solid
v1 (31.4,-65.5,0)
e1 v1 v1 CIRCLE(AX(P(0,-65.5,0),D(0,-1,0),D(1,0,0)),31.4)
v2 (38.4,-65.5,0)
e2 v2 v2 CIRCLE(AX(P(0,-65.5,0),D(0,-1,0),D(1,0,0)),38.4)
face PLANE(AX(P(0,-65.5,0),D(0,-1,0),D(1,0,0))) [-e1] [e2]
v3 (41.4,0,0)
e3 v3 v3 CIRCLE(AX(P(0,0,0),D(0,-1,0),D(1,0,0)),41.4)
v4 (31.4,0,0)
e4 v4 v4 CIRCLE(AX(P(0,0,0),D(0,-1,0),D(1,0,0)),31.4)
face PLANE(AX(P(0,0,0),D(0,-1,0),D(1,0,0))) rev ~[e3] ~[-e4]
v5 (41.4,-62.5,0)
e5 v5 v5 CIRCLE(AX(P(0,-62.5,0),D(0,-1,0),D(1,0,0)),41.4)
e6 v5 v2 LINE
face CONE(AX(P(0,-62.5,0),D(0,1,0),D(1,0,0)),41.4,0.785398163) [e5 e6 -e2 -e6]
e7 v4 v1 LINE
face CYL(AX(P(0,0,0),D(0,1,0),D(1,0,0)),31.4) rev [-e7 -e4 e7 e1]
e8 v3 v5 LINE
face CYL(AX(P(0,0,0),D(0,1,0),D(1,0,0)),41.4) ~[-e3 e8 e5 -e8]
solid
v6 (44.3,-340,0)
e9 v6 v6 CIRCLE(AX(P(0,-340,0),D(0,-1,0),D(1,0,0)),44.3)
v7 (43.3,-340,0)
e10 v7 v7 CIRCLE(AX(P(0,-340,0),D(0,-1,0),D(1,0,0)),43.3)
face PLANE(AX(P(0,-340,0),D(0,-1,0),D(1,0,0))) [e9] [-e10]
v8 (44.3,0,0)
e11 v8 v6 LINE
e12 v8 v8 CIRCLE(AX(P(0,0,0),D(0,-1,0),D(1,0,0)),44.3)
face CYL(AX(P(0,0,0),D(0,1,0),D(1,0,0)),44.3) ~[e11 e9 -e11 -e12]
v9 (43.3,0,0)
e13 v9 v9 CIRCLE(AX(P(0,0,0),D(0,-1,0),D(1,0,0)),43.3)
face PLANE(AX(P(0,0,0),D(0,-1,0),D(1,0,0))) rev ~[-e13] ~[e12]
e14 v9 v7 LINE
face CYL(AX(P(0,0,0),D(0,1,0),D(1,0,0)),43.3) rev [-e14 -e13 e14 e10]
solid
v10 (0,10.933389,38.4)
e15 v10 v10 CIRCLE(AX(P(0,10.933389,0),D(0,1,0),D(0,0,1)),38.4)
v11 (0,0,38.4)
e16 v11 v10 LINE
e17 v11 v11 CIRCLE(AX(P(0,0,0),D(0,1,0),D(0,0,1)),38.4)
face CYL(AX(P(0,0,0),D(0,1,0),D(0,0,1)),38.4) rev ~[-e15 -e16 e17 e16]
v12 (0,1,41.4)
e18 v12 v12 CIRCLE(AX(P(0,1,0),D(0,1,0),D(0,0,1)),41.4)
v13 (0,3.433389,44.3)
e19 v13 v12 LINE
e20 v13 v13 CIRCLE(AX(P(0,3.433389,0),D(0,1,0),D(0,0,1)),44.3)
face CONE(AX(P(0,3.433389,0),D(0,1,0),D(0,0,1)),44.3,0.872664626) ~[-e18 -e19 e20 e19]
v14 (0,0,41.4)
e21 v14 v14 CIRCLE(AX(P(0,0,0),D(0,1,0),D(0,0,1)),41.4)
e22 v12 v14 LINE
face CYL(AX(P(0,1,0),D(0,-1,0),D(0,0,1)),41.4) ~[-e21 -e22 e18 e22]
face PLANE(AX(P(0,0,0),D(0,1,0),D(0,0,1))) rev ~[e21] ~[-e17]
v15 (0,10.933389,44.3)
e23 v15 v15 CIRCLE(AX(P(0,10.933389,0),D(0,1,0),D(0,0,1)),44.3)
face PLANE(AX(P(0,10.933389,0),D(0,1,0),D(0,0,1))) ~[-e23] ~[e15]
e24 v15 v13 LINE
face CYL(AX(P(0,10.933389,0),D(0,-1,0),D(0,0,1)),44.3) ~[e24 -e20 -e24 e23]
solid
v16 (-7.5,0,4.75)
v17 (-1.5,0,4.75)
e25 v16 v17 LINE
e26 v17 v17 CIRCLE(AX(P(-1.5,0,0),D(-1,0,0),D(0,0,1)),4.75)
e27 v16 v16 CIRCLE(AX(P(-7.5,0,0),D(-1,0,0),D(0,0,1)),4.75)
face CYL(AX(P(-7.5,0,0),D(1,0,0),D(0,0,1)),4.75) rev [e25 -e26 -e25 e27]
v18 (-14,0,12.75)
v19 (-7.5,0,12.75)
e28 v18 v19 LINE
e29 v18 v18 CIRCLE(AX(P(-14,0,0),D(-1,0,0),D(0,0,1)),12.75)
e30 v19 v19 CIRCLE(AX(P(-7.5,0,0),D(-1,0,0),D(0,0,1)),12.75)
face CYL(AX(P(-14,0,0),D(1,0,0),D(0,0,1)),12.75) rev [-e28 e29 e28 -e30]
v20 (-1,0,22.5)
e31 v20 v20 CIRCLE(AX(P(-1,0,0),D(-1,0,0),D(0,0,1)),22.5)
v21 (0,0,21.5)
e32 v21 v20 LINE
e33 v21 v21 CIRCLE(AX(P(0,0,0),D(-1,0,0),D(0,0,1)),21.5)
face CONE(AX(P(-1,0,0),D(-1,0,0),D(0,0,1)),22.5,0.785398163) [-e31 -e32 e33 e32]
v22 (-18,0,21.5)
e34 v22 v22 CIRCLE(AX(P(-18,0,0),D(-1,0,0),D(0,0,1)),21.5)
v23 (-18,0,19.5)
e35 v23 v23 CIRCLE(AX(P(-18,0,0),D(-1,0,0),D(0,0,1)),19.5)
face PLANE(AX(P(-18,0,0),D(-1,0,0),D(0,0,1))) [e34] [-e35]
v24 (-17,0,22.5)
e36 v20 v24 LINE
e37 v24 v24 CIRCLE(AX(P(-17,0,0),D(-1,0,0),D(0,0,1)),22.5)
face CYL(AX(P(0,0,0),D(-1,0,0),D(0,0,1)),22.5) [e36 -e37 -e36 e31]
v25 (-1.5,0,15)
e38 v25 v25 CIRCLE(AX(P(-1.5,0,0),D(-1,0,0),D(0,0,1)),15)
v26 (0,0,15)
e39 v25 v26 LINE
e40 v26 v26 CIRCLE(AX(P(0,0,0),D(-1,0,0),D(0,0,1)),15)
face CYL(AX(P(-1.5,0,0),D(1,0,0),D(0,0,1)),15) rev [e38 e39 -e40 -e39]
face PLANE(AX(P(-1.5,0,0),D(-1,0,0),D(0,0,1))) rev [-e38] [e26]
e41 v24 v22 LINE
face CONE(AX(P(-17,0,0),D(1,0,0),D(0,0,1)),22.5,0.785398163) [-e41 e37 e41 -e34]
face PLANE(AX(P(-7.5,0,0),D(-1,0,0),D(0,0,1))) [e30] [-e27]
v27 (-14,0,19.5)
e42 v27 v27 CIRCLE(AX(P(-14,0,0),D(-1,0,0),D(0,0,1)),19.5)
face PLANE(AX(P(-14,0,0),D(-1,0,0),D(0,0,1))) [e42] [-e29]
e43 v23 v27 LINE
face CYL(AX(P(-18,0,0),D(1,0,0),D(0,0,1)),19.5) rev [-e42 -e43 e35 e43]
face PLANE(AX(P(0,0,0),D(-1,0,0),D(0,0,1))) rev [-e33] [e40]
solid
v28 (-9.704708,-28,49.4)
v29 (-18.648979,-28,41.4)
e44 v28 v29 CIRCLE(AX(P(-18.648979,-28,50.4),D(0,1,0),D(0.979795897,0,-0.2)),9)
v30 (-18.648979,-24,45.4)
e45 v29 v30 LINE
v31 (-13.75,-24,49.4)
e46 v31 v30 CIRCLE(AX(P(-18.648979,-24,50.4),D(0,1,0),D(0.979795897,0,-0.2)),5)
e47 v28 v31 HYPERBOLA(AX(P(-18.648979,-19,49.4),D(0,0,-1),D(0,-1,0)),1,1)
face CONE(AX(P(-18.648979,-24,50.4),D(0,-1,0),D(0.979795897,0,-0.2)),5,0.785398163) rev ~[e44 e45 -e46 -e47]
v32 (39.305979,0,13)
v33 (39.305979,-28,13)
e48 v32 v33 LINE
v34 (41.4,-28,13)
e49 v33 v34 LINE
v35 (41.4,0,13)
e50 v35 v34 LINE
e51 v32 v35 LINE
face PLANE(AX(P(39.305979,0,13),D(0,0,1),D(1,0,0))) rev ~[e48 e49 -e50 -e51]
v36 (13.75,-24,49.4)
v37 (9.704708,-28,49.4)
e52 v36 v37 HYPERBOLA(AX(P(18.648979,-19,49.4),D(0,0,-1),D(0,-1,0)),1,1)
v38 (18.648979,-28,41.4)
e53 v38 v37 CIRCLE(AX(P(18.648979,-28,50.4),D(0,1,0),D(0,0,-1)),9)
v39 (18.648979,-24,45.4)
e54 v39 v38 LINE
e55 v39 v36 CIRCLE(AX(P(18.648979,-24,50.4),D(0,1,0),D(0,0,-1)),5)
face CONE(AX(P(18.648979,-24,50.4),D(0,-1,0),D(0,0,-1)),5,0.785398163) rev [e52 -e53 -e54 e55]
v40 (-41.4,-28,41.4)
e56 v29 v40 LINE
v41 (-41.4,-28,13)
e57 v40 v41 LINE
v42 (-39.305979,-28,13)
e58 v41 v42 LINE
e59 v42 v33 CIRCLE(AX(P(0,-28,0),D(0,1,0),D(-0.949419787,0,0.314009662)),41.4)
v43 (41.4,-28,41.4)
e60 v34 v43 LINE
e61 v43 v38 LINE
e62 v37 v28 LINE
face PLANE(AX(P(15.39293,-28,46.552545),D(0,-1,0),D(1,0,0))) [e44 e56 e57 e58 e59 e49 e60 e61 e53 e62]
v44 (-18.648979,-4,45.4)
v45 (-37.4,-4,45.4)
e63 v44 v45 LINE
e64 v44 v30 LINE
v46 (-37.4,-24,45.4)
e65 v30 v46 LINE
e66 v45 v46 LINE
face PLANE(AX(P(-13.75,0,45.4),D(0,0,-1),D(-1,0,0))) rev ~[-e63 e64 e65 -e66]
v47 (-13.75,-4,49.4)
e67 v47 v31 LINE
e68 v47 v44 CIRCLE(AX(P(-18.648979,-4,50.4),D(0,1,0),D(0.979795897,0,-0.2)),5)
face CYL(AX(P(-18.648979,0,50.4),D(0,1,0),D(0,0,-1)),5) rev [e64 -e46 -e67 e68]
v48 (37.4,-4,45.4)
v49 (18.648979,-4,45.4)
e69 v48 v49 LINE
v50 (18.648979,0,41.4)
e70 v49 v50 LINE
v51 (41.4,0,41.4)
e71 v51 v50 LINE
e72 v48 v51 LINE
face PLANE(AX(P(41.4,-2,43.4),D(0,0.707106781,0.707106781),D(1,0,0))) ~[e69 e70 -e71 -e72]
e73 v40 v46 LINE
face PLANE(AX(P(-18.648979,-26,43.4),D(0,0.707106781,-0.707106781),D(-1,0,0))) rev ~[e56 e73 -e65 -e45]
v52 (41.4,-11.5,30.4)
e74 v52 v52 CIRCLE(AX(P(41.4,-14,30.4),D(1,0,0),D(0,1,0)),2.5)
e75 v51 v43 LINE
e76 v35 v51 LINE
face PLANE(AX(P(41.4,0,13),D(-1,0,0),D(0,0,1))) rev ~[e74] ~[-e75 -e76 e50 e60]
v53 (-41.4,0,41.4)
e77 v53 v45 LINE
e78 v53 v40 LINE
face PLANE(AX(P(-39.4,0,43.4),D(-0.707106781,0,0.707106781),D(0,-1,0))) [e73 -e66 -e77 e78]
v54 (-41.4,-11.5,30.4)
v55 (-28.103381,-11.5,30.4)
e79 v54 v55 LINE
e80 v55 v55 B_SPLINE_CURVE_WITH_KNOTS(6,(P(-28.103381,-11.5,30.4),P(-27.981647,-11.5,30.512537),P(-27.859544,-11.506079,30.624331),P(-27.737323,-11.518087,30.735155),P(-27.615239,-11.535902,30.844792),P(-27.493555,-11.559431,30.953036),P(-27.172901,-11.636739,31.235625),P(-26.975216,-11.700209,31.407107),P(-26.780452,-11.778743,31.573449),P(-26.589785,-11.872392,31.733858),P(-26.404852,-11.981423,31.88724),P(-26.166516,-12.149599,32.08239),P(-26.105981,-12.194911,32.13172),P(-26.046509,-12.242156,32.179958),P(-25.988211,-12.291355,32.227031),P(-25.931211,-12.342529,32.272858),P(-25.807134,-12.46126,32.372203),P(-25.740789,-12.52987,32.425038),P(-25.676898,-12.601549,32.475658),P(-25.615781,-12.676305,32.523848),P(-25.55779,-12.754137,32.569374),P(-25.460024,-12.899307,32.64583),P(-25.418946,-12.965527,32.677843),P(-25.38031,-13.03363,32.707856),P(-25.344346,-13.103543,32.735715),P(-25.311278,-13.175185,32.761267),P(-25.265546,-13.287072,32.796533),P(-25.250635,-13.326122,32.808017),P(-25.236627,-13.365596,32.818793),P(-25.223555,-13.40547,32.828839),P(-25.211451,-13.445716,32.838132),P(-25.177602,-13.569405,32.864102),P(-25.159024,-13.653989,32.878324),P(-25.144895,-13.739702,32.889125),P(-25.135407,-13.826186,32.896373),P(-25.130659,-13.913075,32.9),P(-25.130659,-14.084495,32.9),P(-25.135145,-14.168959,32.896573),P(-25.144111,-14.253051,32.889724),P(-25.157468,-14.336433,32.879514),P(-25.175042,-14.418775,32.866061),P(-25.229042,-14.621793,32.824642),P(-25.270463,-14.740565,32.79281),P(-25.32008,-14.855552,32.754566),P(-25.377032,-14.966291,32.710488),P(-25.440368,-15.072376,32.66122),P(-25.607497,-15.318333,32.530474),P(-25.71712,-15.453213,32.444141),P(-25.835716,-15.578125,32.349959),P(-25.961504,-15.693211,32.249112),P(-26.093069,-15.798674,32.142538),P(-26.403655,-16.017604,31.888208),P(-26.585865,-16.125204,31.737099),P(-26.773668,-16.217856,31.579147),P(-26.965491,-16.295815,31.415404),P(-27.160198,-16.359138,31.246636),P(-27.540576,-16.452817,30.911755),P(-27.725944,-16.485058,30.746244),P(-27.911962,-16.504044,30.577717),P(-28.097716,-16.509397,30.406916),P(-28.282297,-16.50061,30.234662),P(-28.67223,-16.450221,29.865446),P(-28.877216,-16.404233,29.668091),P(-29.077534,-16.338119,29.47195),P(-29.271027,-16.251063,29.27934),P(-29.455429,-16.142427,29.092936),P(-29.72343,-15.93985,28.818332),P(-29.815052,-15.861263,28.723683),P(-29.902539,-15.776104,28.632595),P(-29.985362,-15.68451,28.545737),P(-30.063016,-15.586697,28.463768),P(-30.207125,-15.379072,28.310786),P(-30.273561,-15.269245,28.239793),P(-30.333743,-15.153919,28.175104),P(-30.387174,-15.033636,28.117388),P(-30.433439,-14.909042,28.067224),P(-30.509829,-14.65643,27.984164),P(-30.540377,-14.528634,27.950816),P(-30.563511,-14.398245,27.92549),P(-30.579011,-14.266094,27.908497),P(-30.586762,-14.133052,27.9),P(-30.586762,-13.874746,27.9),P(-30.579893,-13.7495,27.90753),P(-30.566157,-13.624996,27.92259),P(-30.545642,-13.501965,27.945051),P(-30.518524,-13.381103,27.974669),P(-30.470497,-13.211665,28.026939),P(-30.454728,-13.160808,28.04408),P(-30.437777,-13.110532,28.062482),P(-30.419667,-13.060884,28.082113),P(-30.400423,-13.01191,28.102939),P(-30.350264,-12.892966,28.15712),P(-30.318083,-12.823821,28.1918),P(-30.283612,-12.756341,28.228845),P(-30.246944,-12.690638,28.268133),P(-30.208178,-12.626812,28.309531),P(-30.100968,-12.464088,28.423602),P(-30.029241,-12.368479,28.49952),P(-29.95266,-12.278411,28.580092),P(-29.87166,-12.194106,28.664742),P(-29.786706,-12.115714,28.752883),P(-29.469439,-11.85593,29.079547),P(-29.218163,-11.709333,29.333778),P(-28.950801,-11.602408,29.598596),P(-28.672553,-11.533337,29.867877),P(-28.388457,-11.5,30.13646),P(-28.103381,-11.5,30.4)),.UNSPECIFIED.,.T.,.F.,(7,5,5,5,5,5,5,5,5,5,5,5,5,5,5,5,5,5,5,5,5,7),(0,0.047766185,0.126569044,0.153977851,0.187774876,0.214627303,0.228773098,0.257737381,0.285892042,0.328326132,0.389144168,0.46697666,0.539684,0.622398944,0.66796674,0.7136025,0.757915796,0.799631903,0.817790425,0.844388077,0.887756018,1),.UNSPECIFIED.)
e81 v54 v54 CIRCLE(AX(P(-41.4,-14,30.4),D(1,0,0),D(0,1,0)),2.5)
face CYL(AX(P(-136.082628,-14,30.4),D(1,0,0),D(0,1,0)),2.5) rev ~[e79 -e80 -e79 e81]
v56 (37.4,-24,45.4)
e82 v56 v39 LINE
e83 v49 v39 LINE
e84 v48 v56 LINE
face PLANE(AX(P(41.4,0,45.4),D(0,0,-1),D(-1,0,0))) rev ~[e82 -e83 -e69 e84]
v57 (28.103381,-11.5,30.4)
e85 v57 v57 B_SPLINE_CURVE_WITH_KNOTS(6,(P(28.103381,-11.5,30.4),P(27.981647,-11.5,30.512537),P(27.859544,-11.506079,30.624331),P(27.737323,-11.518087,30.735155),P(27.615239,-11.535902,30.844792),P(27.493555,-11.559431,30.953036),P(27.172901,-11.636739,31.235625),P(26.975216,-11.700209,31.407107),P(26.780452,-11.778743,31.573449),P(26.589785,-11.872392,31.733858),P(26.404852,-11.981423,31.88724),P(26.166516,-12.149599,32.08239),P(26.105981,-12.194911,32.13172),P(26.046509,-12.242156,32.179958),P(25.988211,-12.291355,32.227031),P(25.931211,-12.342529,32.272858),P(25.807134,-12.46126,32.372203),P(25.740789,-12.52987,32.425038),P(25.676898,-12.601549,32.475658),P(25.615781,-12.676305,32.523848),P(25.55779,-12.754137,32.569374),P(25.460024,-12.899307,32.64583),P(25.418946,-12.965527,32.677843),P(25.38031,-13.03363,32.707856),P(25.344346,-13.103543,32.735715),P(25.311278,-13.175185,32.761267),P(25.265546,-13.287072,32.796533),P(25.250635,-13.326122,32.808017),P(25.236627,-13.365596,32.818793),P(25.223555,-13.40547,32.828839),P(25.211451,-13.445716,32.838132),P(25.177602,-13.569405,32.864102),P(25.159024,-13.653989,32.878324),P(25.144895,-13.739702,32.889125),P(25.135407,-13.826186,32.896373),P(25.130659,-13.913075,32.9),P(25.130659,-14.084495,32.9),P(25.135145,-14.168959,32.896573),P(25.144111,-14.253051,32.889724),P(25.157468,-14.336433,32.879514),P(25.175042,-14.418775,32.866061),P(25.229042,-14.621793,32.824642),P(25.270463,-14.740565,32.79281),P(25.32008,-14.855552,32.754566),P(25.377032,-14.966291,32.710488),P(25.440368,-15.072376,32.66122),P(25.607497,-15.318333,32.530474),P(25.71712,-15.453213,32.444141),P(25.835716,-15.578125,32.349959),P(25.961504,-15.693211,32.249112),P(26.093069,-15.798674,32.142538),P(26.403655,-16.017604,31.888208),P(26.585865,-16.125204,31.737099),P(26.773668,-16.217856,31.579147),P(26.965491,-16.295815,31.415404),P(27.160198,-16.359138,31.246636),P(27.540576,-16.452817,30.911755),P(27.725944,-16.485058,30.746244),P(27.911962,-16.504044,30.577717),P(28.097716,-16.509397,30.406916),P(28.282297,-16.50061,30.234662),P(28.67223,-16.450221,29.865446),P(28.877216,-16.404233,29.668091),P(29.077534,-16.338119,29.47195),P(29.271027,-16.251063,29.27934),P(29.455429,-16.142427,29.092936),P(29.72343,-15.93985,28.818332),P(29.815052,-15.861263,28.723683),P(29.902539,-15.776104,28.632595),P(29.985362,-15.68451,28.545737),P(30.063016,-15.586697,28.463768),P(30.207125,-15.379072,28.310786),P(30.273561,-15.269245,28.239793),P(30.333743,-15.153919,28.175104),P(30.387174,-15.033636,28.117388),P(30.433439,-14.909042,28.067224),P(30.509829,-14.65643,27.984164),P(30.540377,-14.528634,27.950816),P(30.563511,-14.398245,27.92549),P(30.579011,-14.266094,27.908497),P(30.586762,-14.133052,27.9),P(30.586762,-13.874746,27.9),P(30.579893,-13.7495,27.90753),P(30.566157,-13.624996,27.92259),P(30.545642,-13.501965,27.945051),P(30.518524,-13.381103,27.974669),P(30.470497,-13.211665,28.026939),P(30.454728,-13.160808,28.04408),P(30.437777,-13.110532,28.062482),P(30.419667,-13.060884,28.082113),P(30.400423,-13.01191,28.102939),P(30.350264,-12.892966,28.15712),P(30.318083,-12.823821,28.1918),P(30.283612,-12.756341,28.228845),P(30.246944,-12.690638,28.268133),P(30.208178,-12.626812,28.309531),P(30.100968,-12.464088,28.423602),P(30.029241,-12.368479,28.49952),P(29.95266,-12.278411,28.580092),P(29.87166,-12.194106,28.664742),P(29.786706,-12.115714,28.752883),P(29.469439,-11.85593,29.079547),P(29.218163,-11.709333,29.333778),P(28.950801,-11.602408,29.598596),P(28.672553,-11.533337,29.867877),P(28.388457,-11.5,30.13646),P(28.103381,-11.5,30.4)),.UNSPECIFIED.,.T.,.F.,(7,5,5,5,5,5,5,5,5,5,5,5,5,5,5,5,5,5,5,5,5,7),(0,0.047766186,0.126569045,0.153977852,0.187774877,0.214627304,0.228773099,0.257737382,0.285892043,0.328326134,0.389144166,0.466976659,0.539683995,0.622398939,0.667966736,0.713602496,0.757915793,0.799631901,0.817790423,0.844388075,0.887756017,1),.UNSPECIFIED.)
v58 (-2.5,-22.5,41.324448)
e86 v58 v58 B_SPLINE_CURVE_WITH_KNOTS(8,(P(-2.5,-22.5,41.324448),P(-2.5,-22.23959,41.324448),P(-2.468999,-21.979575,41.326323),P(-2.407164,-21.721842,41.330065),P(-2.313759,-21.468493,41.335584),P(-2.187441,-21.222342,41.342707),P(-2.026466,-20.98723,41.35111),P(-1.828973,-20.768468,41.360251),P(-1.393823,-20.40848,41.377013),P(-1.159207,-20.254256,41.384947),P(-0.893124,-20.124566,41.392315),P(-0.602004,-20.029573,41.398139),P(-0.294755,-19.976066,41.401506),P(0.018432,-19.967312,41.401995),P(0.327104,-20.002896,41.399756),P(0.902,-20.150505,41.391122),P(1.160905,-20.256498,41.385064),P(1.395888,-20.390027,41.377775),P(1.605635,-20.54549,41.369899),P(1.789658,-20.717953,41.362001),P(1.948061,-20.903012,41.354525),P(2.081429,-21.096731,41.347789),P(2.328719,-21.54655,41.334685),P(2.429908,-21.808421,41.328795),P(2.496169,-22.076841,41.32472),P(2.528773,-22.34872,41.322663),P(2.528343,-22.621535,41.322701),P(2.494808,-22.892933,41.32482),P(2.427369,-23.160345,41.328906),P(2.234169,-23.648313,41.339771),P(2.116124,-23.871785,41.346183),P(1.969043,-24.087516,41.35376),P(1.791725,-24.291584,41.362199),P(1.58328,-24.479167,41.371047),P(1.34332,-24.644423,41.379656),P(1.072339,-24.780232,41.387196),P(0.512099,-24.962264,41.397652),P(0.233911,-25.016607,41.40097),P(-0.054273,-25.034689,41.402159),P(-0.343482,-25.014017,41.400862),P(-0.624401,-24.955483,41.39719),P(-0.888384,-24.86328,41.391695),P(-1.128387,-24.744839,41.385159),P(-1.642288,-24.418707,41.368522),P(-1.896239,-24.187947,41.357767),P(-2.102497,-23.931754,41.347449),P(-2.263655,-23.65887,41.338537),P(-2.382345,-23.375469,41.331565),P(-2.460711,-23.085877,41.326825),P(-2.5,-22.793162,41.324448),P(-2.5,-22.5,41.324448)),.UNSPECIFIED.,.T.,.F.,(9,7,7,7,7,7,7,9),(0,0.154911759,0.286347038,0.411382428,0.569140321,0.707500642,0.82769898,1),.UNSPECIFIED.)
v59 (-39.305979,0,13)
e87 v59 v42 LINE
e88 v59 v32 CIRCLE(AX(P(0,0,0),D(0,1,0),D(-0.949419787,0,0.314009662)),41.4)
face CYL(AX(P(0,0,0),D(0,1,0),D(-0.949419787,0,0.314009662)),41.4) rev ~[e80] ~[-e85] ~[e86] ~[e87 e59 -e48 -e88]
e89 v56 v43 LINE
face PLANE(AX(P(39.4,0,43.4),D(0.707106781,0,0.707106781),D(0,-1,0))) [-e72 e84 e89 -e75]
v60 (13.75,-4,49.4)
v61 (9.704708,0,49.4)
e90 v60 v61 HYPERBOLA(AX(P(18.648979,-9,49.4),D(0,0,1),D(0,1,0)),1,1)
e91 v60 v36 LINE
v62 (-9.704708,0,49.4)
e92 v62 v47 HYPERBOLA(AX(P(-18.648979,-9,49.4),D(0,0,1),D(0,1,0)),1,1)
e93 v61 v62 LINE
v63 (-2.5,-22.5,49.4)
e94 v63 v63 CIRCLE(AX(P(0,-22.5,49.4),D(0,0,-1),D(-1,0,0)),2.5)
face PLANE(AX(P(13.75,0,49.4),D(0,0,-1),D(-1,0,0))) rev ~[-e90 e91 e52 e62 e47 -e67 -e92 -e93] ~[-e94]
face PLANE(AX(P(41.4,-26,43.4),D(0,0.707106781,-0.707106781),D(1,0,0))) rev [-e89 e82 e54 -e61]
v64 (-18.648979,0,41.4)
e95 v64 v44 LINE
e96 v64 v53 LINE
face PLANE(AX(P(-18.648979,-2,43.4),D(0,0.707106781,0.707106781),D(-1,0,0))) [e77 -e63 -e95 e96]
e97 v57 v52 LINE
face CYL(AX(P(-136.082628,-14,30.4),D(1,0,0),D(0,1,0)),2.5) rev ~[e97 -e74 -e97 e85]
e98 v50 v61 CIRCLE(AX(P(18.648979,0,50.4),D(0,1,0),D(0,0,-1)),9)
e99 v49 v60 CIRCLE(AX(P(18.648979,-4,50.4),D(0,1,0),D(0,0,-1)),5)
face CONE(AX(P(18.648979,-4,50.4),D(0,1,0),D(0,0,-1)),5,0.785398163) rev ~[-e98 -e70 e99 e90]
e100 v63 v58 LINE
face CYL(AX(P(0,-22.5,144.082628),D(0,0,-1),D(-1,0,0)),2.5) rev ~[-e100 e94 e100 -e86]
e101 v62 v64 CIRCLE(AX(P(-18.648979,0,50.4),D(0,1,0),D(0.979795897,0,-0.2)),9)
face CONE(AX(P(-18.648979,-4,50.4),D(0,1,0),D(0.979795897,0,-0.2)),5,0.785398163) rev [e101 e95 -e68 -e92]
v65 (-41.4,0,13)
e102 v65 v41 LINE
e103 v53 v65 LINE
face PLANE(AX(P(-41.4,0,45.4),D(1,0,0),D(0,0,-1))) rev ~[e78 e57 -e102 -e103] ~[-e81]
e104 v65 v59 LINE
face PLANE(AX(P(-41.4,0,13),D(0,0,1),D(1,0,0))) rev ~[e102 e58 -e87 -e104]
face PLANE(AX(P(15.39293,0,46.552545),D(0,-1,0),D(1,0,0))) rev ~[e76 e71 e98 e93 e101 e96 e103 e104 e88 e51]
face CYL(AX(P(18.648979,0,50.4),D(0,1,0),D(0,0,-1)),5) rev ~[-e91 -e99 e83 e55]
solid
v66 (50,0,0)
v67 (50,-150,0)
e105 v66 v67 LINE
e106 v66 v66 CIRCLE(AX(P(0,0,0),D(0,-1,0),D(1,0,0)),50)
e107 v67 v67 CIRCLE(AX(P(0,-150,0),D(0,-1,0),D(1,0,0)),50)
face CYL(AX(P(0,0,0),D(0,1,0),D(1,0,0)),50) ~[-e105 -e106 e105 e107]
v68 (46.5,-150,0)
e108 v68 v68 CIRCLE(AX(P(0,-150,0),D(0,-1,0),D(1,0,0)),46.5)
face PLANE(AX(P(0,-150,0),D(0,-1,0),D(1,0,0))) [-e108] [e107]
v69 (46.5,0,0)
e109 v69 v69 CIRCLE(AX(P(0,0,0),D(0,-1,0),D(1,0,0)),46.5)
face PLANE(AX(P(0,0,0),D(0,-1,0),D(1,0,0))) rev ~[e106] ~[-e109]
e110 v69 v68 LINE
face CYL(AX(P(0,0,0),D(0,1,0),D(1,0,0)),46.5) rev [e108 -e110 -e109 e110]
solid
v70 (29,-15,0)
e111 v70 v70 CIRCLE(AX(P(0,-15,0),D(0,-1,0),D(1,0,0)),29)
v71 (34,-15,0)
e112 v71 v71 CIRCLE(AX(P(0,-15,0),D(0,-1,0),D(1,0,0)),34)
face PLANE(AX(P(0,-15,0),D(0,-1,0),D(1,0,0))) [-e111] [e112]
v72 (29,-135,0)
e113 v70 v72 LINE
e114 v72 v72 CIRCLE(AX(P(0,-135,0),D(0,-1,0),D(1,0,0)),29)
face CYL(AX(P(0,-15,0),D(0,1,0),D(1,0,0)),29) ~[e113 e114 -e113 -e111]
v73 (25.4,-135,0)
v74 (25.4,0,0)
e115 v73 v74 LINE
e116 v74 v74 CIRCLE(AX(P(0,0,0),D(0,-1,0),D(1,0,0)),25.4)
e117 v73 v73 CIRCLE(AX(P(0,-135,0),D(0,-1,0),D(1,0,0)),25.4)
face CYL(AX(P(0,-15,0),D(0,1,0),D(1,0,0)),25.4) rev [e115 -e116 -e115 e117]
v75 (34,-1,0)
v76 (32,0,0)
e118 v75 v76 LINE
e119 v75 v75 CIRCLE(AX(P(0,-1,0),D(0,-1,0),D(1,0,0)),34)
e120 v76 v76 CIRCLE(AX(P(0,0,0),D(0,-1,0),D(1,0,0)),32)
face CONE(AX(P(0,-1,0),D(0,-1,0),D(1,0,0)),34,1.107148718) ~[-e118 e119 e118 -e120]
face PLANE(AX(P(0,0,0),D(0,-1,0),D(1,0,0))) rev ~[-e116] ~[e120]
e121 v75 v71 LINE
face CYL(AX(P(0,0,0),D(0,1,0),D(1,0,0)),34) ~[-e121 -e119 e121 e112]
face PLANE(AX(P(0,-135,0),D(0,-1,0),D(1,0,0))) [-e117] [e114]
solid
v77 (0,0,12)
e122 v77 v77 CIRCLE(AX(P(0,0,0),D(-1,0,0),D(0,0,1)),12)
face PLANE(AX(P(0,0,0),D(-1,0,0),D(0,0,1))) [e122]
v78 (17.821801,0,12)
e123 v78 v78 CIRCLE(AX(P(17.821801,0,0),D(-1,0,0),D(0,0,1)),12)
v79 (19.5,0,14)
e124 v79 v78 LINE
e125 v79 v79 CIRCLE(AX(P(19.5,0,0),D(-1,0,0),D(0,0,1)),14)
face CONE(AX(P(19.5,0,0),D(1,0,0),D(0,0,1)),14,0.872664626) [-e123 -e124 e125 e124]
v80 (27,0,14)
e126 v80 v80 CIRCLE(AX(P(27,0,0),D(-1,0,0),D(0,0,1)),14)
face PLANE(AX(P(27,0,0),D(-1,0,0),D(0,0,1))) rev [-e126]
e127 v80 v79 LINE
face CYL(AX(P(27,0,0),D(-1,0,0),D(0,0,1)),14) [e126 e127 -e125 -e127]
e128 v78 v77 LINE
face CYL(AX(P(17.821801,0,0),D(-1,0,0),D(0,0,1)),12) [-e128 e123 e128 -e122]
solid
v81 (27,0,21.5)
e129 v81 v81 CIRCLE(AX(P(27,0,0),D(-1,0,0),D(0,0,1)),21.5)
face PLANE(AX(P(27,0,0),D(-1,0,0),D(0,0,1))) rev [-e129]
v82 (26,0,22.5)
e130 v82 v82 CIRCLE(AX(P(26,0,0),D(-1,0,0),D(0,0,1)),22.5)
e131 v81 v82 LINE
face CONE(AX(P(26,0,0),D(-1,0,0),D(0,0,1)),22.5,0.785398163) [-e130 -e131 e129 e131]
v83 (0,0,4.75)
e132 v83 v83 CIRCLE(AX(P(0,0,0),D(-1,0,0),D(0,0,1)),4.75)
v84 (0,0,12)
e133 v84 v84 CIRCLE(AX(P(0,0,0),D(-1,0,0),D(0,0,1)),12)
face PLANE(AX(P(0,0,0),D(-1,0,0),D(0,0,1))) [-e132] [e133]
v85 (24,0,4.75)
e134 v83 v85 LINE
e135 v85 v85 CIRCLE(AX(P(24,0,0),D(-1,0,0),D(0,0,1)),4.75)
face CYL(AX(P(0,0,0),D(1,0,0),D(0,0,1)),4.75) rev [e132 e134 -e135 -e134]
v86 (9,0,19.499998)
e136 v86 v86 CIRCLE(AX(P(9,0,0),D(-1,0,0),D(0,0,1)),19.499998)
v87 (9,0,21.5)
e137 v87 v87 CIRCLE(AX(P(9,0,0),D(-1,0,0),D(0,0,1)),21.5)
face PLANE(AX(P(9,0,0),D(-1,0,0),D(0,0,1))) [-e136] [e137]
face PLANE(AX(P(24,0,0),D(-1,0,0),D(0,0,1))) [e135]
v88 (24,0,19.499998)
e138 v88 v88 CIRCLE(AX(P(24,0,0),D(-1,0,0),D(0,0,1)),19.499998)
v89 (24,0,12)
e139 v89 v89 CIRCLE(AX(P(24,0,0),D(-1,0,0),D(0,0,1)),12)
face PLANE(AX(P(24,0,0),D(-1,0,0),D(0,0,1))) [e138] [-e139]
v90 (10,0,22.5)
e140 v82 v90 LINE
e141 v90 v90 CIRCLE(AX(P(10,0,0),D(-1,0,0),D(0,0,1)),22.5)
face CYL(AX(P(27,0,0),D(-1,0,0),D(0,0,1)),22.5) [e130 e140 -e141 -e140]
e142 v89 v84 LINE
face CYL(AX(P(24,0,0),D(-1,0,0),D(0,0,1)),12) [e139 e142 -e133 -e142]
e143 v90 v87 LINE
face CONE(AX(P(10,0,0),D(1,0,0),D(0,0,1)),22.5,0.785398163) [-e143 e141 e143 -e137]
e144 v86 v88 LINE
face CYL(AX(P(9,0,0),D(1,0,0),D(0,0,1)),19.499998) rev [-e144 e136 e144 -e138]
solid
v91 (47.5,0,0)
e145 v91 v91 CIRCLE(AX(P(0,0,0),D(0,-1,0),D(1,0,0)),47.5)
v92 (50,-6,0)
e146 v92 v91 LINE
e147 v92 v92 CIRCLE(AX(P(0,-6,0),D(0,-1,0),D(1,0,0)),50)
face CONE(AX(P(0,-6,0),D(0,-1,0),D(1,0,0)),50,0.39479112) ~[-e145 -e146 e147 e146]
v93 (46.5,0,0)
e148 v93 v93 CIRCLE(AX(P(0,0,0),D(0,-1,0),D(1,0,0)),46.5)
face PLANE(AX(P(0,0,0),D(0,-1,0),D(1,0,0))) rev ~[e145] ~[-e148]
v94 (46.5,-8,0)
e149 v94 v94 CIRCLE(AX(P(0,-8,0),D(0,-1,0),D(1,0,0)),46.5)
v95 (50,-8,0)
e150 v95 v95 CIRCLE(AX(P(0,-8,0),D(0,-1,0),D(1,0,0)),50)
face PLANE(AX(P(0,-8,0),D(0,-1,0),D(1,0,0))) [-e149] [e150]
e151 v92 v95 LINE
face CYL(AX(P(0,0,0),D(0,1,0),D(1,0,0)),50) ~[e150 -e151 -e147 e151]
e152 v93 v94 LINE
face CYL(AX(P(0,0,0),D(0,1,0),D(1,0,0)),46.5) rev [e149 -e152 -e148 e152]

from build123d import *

# Parameters (mm, degrees)
F0_R         = 41.4
F0_R_2       = 31.4
F1_DEPTH     = 65.5
F2_SIZE      = 3
F3_R         = 34
F3_R_2       = 25.4
F4_DEPTH     = 15
F5_R         = 29
F5_R_2       = 25.4
F6_DEPTH     = 120
F7_SIZE2     = 2
F7_SIZE      = 1
F11_DEPTH    = 28
F13_D        = 5
F14_T1_DEPTH = 28
F15_SIZE     = 4
F19_D        = 5
F22_SIZE     = 1
F25_SIZE     = 1
F26_R        = 44.3
F26_R_2      = 43.3
F27_DEPTH    = 340
F28_R        = 50
F28_R_2      = 46.5
F29_DEPTH    = 150
F30_R        = 50
F30_R_2      = 46.5
F31_DEPTH    = 8
F32_SIZE2    = 2.5
F32_SIZE     = 6


# Not quite as in the source:
# - a fillet or chamfer that OpenCascade refuses, or shapes differently, is made with other operations: its cross-section is extruded or revolved along the edge and cut away or added


with BuildPart() as f1:
    # F0 (on Front) → F1 (new body)
    with BuildSketch(Plane.XZ):
        Circle(F0_R)
        Circle(F0_R_2, mode=Mode.SUBTRACT)
    extrude(amount=F1_DEPTH)

    # F2
    f2_edges = [f1.edges().sort_by_distance(p)[0] for p in [
        (-41.4, -65.5, 0),
    ]]
    chamfer(f2_edges, length=F2_SIZE)


with BuildPart() as f4:
    # F3 (on Front) → F4 (new body)
    with BuildSketch(Plane.XZ):
        Circle(F3_R)
        Circle(F3_R_2, mode=Mode.SUBTRACT)
    extrude(amount=F4_DEPTH)

    # F5 (on face) → F6 (join)
    with BuildSketch(Plane.XZ.offset(15)):
        Circle(F5_R)
        Circle(F5_R_2, mode=Mode.SUBTRACT)
    extrude(amount=F6_DEPTH)

    # F7
    f7_edges = [f4.edges().sort_by_distance(p)[0] for p in [
        (-34, 0, 0),
    ]]
    f7_side = f4.faces().sort_by_distance((-34, -7.5, 0))[0]
    chamfer(f7_edges, length=F7_SIZE, length2=F7_SIZE2, reference=f7_side)


with BuildPart() as f9:
    # F8 (on Right) → F9 (revolve)
    with BuildSketch(Plane.YZ):
        Polygon((0, 41.4), (0, 38.4), (10.9333889304, 38.4), (10.9333889304, 44.3), (3.4333889304, 44.3), (1, 41.4), align=None)
    revolve(axis=Axis((0, 5.4666944652, 0), (0, 1, 0)))


with BuildPart() as f11:
    # F10 (on Front) → F11 (new body)
    with BuildSketch(Plane.XZ):
        with BuildLine():
            Line((-41.4, 45.4), (-41.4, 13))
            Line((-41.4, 13), (-39.3059791889, 13))
            ThreePointArc((-39.3059791889, 13), (0, 41.4), (39.3059791889, 13))
            Line((39.3059791889, 13), (41.4, 13))
            Line((41.4, 13), (41.4, 45.4))
            Line((41.4, 45.4), (13.75, 45.4))
            Line((13.75, 45.4), (13.75, 49.4))
            Line((13.75, 49.4), (-13.75, 49.4))
            Line((-13.75, 49.4), (-13.75, 45.4))
            Line((-13.75, 45.4), (-41.4, 45.4))
        make_face()
    extrude(amount=F11_DEPTH)

    # F13 (through all)
    with Locations(Plane.XY.offset(49.4)):
        with Locations((0, -22.5)):
            Hole(F13_D / 2)

    # F14: fillet of radius 5 on 2 edges, made by hand

    # F14_s2 → F14_t1 (join)
    with BuildSketch(Plane.XZ):
        with BuildLine():
            ThreePointArc((18.6489794856, 45.4), (15.4867018254, 46.5270166538), (13.75, 49.4))
            Line((13.75, 49.4), (13.75, 45.4))
            Line((13.75, 45.4), (18.6489794856, 45.4))
        make_face()
        with BuildLine():
            ThreePointArc((-18.6489794856, 45.4), (-15.4867018254, 46.5270166538), (-13.75, 49.4))
            Line((-13.75, 49.4), (-13.75, 45.4))
            Line((-13.75, 45.4), (-18.6489794856, 45.4))
        make_face()
    extrude(amount=F14_T1_DEPTH)

    # F15
    f15_edges = [f11.edges().sort_by_distance(p)[0] for p in [
        (-30.02449, -28, 45.4),
        (-41.4, -14, 45.4),
        (-30.02449, 0, 45.4),
        (30.02449, 0, 45.4),
        (41.4, -14, 45.4),
        (30.02449, -28, 45.4),
        (15.486702, -28, 46.527017),
        (-15.486702, -28, 46.527017),
    ]]
    chamfer(f15_edges, length=F15_SIZE)

    # F19 (through all)
    with Locations(Plane(origin=(-41.4, 0, 0), x_dir=(0, -1, 0), z_dir=(-1, 0, 0))):
        with Locations((14, 30.4)):
            Hole(F19_D / 2)


with BuildPart() as f17:
    # F16 (on Front) → F17 (revolve)
    with BuildSketch(Plane.XZ):
        Polygon((17.8218007376, 12), (0, 12), (0, 0), (27, 0), (27, 14), (19.5, 14), align=None)
    revolve(axis=Axis((13.5, 0, 0), (-1, 0, 0)))


with BuildPart() as f21:
    # F20 (on Front) → F21 (revolve)
    with BuildSketch(Plane.XZ):
        Polygon((0, 15), (0, 22.5), (-18, 22.5), (-18, 19.5), (-14, 19.5), (-14, 12.75), (-7.5, 12.75), (-7.5, 4.75), (-1.5, 4.75), (-1.5, 15), align=None)
    revolve(axis=Axis((-9, 0, 0), (-1, 0, 0)))

    # F22
    f22_edges = [f21.edges().sort_by_distance(p)[0] for p in [
        (0, 0, -22.5),
        (-18, 0, -22.5),
    ]]
    chamfer(f22_edges, length=F22_SIZE)


with BuildPart() as f24:
    # F23 (on Front) → F24 (revolve)
    with BuildSketch(Plane.XZ):
        Polygon((0, 12), (0, 4.75), (24, 4.75), (24, 0), (27, 0), (27, 22.5), (9, 22.5), (9, 19.4999976456), (24, 19.4999976456), (24, 12), align=None)
    revolve(axis=Axis((25.5, 0, 0), (-1, 0, 0)))

    # F25
    f25_edges = [f24.edges().sort_by_distance(p)[0] for p in [
        (27, 0, -22.5),
        (9, 0, -22.5),
    ]]
    chamfer(f25_edges, length=F25_SIZE)


with BuildPart() as f27:
    # F26 (on Front) → F27 (new body)
    with BuildSketch(Plane.XZ):
        Circle(F26_R)
        Circle(F26_R_2, mode=Mode.SUBTRACT)
    extrude(amount=F27_DEPTH)


with BuildPart() as f29:
    # F28 (on Front) → F29 (new body)
    with BuildSketch(Plane.XZ):
        Circle(F28_R)
        Circle(F28_R_2, mode=Mode.SUBTRACT)
    extrude(amount=F29_DEPTH)


with BuildPart() as f31:
    # F30 (on Front) → F31 (new body)
    with BuildSketch(Plane.XZ):
        Circle(F30_R)
        Circle(F30_R_2, mode=Mode.SUBTRACT)
    extrude(amount=F31_DEPTH)

    # F32
    f32_edges = [f31.edges().sort_by_distance(p)[0] for p in [
        (-50, 0, 0),
    ]]
    f32_side = f31.faces().sort_by_distance((-50, -4, 0))[0]
    chamfer(f32_edges, length=F32_SIZE, length2=F32_SIZE2, reference=f32_side)


solid = Compound([f1.part, f4.part, f9.part, f11.part, f17.part, f21.part, f24.part, f27.part, f29.part, f31.part])
